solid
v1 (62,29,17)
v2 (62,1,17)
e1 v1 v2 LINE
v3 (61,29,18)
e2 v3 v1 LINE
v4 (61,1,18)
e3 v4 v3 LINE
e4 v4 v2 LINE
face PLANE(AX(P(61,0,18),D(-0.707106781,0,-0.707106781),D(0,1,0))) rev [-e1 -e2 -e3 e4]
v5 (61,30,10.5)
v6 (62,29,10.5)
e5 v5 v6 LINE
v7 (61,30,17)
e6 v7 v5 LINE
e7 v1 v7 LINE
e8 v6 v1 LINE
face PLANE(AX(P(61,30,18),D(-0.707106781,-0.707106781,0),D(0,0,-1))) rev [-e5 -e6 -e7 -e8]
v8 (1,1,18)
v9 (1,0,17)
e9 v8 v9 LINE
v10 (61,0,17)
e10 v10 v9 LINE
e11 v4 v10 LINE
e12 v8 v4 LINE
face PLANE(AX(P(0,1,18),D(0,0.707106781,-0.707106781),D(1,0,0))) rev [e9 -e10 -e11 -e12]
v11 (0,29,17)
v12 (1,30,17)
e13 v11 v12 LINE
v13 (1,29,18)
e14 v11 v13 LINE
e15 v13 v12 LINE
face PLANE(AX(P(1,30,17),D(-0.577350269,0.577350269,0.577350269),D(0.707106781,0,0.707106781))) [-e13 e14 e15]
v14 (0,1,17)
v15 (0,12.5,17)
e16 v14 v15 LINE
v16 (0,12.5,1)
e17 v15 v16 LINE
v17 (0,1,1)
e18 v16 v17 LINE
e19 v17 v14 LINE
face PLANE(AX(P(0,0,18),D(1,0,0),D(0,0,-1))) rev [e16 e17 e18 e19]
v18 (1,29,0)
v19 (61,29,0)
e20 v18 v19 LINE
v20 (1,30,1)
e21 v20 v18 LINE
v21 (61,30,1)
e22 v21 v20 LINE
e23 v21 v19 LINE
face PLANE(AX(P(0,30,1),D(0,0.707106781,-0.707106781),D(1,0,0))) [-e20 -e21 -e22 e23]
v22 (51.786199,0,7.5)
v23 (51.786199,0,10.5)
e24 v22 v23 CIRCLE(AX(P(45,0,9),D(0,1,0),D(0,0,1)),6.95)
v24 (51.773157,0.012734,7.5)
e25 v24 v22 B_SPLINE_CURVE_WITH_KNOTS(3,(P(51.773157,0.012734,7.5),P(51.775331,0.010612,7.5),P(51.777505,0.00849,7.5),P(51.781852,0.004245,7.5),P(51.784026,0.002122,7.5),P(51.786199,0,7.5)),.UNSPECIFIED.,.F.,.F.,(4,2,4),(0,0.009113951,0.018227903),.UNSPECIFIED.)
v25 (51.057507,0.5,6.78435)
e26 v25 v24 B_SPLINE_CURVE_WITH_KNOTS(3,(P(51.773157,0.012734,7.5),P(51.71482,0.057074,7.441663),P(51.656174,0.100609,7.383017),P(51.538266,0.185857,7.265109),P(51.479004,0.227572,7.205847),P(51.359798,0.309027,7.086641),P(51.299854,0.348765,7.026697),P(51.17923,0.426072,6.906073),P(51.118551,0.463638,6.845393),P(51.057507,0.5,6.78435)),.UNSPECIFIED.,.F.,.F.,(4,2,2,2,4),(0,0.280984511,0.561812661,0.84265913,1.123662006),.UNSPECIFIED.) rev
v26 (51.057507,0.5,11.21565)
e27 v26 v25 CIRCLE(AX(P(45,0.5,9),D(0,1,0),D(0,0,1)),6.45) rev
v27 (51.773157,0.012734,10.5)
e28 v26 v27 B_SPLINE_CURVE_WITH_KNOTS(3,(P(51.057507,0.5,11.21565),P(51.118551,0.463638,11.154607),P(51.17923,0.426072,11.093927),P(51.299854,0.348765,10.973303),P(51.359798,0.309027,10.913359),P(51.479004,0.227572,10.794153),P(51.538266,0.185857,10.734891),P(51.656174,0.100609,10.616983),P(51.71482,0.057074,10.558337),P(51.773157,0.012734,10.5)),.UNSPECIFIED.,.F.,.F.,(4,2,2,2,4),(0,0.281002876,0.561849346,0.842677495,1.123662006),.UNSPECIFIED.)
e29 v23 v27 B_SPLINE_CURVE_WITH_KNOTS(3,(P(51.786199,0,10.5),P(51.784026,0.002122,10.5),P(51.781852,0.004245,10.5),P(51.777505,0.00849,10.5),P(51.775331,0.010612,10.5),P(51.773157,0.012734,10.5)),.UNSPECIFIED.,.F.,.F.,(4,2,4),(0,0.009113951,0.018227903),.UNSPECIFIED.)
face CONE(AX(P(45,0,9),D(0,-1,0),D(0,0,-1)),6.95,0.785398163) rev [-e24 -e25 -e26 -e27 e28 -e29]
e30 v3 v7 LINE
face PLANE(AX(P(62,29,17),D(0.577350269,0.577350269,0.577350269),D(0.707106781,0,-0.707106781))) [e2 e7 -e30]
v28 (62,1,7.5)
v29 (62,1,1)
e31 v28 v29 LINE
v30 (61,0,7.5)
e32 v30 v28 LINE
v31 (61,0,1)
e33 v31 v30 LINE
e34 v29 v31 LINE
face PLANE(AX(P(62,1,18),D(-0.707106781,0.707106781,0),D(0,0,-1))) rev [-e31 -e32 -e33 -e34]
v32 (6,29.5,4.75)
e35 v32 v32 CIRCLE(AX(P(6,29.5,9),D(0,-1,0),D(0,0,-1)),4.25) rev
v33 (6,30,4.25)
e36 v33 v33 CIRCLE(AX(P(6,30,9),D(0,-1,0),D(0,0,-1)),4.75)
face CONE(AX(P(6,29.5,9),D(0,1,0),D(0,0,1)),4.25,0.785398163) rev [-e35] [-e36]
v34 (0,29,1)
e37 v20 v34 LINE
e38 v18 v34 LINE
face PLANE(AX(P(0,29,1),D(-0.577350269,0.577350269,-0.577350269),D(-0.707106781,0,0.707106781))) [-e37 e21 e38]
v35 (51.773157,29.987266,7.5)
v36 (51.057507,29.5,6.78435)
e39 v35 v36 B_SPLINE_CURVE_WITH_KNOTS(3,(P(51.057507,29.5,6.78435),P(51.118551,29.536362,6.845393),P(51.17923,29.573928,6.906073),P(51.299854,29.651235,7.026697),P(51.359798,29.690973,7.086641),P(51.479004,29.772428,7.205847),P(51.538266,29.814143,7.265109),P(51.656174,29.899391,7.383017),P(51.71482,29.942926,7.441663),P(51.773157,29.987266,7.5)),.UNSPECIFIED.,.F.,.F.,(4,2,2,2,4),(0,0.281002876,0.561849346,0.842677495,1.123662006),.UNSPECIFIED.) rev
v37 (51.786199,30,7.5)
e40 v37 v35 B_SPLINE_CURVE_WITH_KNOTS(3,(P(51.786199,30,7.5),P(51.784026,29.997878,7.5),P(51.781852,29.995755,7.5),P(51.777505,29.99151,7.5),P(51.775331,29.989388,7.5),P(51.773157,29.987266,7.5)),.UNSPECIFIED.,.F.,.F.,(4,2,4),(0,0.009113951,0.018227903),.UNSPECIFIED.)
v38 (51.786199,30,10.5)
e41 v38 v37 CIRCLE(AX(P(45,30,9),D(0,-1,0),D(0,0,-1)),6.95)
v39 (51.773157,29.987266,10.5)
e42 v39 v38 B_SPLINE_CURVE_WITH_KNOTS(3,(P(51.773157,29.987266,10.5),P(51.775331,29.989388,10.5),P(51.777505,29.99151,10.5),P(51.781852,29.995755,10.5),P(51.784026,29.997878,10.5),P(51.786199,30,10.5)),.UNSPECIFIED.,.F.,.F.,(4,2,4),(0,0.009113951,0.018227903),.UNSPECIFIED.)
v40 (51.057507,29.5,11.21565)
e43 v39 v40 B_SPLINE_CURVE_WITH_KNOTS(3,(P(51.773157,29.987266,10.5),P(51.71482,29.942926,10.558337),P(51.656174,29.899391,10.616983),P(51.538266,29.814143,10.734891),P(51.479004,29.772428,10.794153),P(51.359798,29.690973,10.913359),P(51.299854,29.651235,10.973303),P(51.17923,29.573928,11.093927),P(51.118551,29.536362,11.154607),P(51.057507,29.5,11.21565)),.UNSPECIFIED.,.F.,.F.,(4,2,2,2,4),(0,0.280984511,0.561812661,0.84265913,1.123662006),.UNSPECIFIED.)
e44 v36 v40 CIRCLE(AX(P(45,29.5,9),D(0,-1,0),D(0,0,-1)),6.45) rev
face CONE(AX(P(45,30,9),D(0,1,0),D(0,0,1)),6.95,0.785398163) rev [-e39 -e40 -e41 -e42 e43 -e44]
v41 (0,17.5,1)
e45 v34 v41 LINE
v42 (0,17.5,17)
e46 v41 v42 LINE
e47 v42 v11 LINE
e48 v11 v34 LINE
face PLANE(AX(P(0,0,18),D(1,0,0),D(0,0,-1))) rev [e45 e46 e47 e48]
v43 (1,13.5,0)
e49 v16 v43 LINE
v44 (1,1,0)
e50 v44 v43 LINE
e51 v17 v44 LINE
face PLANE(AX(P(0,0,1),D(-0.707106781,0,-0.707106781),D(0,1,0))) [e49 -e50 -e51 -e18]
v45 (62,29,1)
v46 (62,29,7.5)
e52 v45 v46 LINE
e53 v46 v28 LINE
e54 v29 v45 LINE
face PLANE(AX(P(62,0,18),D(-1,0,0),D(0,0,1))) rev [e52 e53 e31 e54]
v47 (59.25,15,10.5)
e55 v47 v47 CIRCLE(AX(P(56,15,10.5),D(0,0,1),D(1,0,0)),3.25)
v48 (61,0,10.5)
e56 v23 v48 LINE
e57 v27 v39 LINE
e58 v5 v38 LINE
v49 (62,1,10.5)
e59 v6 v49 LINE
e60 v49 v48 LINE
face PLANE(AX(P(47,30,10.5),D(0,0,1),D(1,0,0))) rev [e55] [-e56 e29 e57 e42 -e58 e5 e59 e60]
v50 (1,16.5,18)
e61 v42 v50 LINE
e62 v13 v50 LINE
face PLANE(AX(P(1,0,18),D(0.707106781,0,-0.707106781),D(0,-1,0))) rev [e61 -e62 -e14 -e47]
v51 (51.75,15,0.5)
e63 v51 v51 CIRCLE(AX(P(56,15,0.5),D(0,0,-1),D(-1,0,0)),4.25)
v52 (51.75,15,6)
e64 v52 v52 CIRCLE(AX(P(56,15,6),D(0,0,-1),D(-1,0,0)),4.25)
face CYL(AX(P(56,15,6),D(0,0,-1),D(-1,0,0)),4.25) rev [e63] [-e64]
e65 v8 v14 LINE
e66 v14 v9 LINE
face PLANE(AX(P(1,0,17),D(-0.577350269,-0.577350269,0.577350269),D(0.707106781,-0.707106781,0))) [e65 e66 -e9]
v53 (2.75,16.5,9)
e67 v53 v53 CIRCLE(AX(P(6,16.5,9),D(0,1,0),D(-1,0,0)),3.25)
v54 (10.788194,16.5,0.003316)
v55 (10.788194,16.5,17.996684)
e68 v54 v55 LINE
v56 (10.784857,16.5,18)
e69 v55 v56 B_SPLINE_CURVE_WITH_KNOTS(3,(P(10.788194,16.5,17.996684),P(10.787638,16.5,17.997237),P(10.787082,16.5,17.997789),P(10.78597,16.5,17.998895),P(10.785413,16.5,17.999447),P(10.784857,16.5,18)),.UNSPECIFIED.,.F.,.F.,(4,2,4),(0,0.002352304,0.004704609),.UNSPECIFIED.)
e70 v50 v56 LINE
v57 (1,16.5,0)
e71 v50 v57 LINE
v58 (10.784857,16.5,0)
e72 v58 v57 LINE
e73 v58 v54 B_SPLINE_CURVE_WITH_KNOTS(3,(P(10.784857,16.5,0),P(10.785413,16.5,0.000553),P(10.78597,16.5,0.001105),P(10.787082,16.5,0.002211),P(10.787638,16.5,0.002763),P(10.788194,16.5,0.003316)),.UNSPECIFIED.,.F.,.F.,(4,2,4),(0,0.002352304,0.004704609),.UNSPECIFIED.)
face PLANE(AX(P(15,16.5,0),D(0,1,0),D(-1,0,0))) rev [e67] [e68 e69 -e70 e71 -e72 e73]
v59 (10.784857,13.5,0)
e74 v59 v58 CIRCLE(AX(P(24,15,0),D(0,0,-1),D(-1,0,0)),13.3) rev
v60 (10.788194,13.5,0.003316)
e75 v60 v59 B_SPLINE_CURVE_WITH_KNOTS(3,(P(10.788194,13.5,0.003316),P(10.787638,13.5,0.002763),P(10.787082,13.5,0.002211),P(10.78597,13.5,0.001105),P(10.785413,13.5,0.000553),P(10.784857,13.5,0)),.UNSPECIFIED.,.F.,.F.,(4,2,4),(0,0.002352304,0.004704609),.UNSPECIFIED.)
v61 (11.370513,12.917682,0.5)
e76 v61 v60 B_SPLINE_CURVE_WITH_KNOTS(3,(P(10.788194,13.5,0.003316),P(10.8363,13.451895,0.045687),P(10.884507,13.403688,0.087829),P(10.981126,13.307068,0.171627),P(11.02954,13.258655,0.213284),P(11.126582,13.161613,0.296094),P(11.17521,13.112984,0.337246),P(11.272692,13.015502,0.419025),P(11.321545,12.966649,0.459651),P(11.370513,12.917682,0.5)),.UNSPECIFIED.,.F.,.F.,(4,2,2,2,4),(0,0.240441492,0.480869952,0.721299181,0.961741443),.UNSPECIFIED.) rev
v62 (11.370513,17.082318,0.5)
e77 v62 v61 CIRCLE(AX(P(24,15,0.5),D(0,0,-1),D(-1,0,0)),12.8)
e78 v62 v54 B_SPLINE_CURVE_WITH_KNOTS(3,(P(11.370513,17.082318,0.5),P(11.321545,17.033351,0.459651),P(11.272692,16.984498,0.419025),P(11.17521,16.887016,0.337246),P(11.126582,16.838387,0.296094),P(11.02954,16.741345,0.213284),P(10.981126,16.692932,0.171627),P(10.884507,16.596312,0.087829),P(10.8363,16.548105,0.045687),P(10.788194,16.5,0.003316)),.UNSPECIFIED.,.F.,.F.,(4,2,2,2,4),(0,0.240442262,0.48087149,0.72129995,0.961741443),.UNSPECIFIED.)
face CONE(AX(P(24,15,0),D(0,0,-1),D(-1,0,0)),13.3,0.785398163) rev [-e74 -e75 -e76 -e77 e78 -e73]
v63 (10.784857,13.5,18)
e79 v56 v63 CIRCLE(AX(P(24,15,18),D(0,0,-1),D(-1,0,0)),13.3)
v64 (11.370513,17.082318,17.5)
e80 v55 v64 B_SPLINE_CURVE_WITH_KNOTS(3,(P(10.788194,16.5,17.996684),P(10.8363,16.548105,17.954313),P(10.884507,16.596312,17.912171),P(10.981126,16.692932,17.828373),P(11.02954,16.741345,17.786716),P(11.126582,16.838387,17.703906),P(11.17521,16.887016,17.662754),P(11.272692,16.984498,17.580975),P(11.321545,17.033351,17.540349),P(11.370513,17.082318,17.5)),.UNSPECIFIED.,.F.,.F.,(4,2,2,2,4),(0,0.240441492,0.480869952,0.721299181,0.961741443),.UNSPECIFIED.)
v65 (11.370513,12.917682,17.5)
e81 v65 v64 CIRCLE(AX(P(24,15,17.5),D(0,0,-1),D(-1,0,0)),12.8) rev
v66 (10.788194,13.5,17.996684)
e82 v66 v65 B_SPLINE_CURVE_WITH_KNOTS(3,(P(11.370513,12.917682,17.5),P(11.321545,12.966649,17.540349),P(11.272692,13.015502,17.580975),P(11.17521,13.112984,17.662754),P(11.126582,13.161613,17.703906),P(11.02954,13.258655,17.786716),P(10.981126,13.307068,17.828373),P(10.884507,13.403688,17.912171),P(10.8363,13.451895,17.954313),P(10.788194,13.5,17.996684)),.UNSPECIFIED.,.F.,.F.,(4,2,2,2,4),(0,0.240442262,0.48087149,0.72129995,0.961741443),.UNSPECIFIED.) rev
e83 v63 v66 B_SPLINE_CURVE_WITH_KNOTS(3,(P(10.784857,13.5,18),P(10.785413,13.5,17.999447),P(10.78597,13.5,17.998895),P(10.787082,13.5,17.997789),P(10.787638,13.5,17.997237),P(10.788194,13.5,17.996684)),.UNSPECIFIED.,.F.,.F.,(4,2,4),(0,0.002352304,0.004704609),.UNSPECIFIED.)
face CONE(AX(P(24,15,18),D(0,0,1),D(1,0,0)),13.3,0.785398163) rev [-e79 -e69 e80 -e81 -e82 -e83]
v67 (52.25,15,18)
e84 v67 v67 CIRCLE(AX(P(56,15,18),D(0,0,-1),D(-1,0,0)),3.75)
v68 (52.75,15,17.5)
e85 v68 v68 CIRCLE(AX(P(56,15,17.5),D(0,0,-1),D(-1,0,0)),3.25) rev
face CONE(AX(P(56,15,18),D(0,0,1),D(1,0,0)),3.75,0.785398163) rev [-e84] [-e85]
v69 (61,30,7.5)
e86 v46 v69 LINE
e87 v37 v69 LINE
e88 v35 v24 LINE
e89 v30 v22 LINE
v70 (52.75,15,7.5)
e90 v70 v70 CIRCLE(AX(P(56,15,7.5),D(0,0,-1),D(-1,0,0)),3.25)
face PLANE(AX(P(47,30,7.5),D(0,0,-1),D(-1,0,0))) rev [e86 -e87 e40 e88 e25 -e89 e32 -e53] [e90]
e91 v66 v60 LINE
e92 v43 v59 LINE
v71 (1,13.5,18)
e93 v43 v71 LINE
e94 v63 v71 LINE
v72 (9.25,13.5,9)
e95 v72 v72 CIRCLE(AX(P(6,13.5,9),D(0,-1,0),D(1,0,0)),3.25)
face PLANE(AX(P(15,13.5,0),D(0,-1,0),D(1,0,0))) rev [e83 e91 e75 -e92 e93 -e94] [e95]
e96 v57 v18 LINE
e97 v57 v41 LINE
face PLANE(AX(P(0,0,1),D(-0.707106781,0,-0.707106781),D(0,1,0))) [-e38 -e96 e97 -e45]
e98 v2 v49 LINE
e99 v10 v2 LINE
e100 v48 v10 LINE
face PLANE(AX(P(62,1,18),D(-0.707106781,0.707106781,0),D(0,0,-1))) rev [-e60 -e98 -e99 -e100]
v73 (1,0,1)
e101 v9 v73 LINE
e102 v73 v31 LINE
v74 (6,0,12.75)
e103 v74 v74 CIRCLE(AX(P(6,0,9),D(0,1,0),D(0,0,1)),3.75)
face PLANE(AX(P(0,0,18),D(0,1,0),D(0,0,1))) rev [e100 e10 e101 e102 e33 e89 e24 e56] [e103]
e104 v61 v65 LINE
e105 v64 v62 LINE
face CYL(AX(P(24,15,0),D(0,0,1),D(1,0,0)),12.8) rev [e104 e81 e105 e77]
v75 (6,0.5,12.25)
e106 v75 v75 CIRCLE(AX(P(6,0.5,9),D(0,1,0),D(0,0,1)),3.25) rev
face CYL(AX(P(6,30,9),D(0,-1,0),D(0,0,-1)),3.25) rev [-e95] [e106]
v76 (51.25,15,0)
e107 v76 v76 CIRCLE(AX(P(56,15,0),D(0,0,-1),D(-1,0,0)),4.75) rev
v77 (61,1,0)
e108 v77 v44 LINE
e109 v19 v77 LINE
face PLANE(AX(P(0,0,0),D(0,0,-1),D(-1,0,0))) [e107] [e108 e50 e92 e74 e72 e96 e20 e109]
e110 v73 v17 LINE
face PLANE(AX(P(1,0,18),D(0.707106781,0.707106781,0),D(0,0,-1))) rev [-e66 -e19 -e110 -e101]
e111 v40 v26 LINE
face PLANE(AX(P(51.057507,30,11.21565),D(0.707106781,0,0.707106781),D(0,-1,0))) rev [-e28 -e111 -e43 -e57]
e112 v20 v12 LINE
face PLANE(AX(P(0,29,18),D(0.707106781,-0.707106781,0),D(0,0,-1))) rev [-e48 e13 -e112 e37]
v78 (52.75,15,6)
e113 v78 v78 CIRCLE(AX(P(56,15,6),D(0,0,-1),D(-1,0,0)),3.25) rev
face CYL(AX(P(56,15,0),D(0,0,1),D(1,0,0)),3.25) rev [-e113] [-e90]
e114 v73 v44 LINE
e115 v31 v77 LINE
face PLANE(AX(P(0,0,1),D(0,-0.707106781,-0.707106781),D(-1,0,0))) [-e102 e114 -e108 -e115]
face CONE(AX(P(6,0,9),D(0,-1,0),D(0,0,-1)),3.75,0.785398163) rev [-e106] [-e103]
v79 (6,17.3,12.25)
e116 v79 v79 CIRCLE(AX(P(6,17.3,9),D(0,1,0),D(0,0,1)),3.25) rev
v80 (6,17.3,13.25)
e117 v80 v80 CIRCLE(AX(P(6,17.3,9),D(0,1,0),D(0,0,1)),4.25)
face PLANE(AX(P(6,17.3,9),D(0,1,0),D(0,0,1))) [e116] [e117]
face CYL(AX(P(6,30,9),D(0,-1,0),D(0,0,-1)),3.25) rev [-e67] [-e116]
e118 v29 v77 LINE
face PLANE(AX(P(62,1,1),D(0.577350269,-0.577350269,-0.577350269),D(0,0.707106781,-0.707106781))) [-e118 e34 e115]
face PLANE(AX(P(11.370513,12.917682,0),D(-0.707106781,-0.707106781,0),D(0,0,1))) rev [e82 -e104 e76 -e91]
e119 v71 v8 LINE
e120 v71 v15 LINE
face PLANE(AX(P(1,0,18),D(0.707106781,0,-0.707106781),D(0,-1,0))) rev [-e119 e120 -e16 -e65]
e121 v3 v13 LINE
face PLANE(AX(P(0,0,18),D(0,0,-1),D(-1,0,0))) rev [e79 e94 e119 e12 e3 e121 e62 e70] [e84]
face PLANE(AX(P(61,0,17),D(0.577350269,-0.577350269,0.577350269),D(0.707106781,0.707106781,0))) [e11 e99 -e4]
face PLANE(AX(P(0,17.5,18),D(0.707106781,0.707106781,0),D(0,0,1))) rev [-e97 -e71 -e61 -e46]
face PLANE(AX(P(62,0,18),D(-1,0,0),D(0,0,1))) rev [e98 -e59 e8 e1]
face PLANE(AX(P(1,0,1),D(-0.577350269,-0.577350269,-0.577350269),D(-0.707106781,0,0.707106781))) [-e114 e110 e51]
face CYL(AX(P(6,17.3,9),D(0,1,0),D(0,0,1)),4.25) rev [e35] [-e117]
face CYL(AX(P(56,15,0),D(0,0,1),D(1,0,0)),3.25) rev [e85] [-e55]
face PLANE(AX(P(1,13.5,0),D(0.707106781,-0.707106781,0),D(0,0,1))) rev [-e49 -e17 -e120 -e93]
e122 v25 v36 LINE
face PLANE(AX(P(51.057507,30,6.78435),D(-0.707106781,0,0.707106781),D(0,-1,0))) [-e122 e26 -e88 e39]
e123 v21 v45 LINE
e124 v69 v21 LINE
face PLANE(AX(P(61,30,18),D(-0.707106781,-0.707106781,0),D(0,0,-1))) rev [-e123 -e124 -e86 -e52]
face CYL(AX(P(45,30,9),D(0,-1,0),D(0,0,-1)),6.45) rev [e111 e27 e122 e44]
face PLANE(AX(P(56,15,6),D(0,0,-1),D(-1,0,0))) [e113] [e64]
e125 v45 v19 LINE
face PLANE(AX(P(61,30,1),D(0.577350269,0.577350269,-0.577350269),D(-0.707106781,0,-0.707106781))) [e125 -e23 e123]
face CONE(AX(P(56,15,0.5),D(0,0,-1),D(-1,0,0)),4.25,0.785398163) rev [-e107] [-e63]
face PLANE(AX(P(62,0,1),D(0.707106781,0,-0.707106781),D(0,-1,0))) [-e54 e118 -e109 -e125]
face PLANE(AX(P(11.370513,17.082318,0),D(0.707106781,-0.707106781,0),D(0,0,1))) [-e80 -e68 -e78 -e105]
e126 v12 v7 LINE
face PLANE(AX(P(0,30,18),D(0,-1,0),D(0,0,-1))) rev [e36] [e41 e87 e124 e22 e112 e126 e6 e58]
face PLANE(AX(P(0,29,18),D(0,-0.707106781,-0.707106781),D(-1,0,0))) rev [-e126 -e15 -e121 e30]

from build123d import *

# Parameters (mm, degrees)
ESQUISSE1_W                  = 62
ESQUISSE1_H                  = 30
BOSS_EXTRU_1_DEPTH           = 18
ENL_V_MAT_EXTRU_1_DEPTH      = 72.189886922
ENL_V_MAT_EXTRU_1_DEPTH_BACK = 72.189886922
ESQUISSE2_R                  = 12.8
ENL_V_MAT_EXTRU_2_DEPTH      = 72.189886922
ENL_V_MAT_EXTRU_2_DEPTH_BACK = 72.189886922
ESQUISSE3_W                  = 15
ESQUISSE3_H                  = 3
ENL_V_MAT_EXTRU_3_DEPTH      = 72.189886922
ENL_V_MAT_EXTRU_3_DEPTH_BACK = 72.189886922
ESQUISSE4_R                  = 6.45
ESQUISSE4_R_2                = 3.25
ENL_V_MAT_EXTRU_4_DEPTH      = 72.189886922
ENL_V_MAT_EXTRU_4_DEPTH_BACK = 72.189886922
ESQUISSE6_W                  = 15
ESQUISSE6_H                  = 3
ENL_V_MAT_EXTRU_5_DEPTH      = 72.189886922
ENL_V_MAT_EXTRU_5_DEPTH_BACK = 72.189886922
ESQUISSE8_R                  = 3.25
ESQUISSE9_R                  = 4.25
ENL_V_MAT_EXTRU_6_DEPTH      = 12.7
ESQUISSE10_R                 = 4.25
ENL_V_MAT_EXTRU_7_DEPTH      = 6
CHANFREIN1_SIZE              = 0.5
CHANFREIN2_SIZE              = 1


with BuildPart() as part:
    # Esquisse1 → Boss.-Extru.1 (new body)
    with BuildSketch(Plane.XY):
        with Locations((31, 15)):
            Rectangle(ESQUISSE1_W, ESQUISSE1_H)
    extrude(amount=BOSS_EXTRU_1_DEPTH)

    # Esquisse2 → Enlèv. mat.-Extru.1 (cut, two sides: drawn at the far end of the back side and taken through both)
    with BuildSketch(Plane.XY.offset(18).offset(-ENL_V_MAT_EXTRU_1_DEPTH_BACK)):
        with Locations((24, 15)):
            Circle(ESQUISSE2_R)
    extrude(amount=ENL_V_MAT_EXTRU_1_DEPTH + ENL_V_MAT_EXTRU_1_DEPTH_BACK, mode=Mode.SUBTRACT)

    # Esquisse3 → Enlèv. mat.-Extru.2 (cut, two sides: drawn at the far end of the back side and taken through both)
    with BuildSketch(Plane.XY.offset(18).offset(-ENL_V_MAT_EXTRU_2_DEPTH_BACK)):
        with Locations((7.5, 15)):
            Rectangle(ESQUISSE3_W, ESQUISSE3_H)
    extrude(amount=ENL_V_MAT_EXTRU_2_DEPTH + ENL_V_MAT_EXTRU_2_DEPTH_BACK, mode=Mode.SUBTRACT)

    # Esquisse4 → Enlèv. mat.-Extru.3 (cut, two sides: drawn at the far end of the back side and taken through both)
    with BuildSketch(Plane.XZ.offset(-ENL_V_MAT_EXTRU_3_DEPTH_BACK)):
        with Locations(Location((45, 9, 0), (0, 0, 270))):
            Circle(ESQUISSE4_R)
        with Locations((6, 9)):
            Circle(ESQUISSE4_R_2)
    extrude(amount=ENL_V_MAT_EXTRU_3_DEPTH + ENL_V_MAT_EXTRU_3_DEPTH_BACK, mode=Mode.SUBTRACT)

    # Esquisse6 → Enlèv. mat.-Extru.4 (cut, two sides: drawn at the far end of the back side and taken through both)
    with BuildSketch(Plane.XZ.offset(-ENL_V_MAT_EXTRU_4_DEPTH_BACK)):
        with Locations((54.5, 9)):
            Rectangle(ESQUISSE6_W, ESQUISSE6_H)
    extrude(amount=ENL_V_MAT_EXTRU_4_DEPTH + ENL_V_MAT_EXTRU_4_DEPTH_BACK, mode=Mode.SUBTRACT)

    # Esquisse8 → Enlèv. mat.-Extru.5 (cut, two sides: drawn at the far end of the back side and taken through both)
    with BuildSketch(Plane.XY.offset(18).offset(-ENL_V_MAT_EXTRU_5_DEPTH_BACK)):
        with Locations((56, 15)):
            Circle(ESQUISSE8_R)
    extrude(amount=ENL_V_MAT_EXTRU_5_DEPTH + ENL_V_MAT_EXTRU_5_DEPTH_BACK, mode=Mode.SUBTRACT)

    # Esquisse9 → Enlèv. mat.-Extru.6 (cut)
    with BuildSketch(Plane(origin=(0, 30, 0), x_dir=(1, 0, 0), z_dir=(0, 1, 0))):
        with Locations(Location((6, -9, 0), (0, 0, 270))):
            Circle(ESQUISSE9_R)
    extrude(amount=-ENL_V_MAT_EXTRU_6_DEPTH, mode=Mode.SUBTRACT)

    # Esquisse10 → Enlèv. mat.-Extru.7 (cut)
    with BuildSketch(Plane(origin=(0, 0, 0), x_dir=(-1, 0, 0), z_dir=(0, 0, -1))):
        with Locations((-56, 15)):
            Circle(ESQUISSE10_R)
    extrude(amount=-ENL_V_MAT_EXTRU_7_DEPTH, mode=Mode.SUBTRACT)

    # Chanfrein1
    # the kernel refuses this chamfer: 0.675653437, 0.570826882, 0.5 mm, written as the material it takes off along each edge
    with BuildSketch(Plane(origin=(6, 0, 9), x_dir=(1, 0, 0), z_dir=(0, 0, -1))) as chanfrein1_piece_1:
        Polygon((3.25 + CHANFREIN1_SIZE, 0), (3.25, -CHANFREIN1_SIZE), (3.25, 0), align=None)
    revolve(axis=Axis((6, 0, 9), (0, -1, 0)), mode=Mode.SUBTRACT)
    with BuildSketch(Plane(origin=(56, 15, 18), x_dir=(1, 0, 0), z_dir=(0, -1, 0))) as chanfrein1_piece_2:
        Polygon((3.25 + CHANFREIN1_SIZE, 0), (3.25, -CHANFREIN1_SIZE), (3.25, 0), align=None)
    revolve(axis=Axis((56, 15, 18), (0, 0, 1)), mode=Mode.SUBTRACT)
    with BuildSketch(Plane(origin=(6, 30, 9), x_dir=(0, 0, 1), z_dir=(-1, 0, 0))) as chanfrein1_piece_3:
        Polygon((4.25 + CHANFREIN1_SIZE, 0), (4.25, -CHANFREIN1_SIZE), (4.25, 0), align=None)
    revolve(axis=Axis((6, 30, 9), (0, 1, 0)), mode=Mode.SUBTRACT)
    with BuildSketch(Plane(origin=(56, 15, 0), x_dir=(-1, 0, 0), z_dir=(0, -1, 0))) as chanfrein1_piece_4:
        Polygon((4.25 + CHANFREIN1_SIZE, 0), (4.25, -CHANFREIN1_SIZE), (4.25, 0), align=None)
    revolve(axis=Axis((56, 15, 0), (0, 0, -1)), mode=Mode.SUBTRACT)
    with BuildSketch(Plane(origin=(11.288194463, 16.5, -1.516273716), x_dir=(0.1399712439743316, 0.990155569019474, 0), z_dir=(0, 0, 1))) as chanfrein1_piece_5:
        with BuildLine():
            Line((0.588107761, 0), (-CHANFREIN1_SIZE * 0.139971243974, CHANFREIN1_SIZE * 0.990155569019))
            Line((-CHANFREIN1_SIZE * 0.139971243974, CHANFREIN1_SIZE * 0.990155569019), (0, 0))
            ThreePointArc((0, 0), (0.303184371, 0.003374833), (0.588107761, 0))
        make_face()
    extrude(amount=21.032547433, mode=Mode.SUBTRACT)
    with BuildSketch(Plane(origin=(11.288194463, 13.5, -1.516273716), x_dir=(-1, 0, 0), z_dir=(0, 0, 1))) as chanfrein1_piece_6:
        with BuildLine():
            Line((CHANFREIN1_SIZE, 0), (-0.082318175, 0.582318175))
            ThreePointArc((-0.082318175, 0.582318175), (-0.039095484, 0.300672073), (0, 0))
            Line((0, 0), (CHANFREIN1_SIZE, 0))
        make_face()
    extrude(amount=21.032547433, mode=Mode.SUBTRACT)
    with BuildSketch(Plane(origin=(51.2731571, 31.928380981, 10.5), x_dir=(1, 0, 0), z_dir=(0, -1, 0))) as chanfrein1_piece_7:
        with BuildLine():
            Line((CHANFREIN1_SIZE, 0), (-0.215649634, 0.715649634))
            ThreePointArc((-0.215649634, 0.715649634), (-0.100904588, 0.372377882), (0, 0))
            Line((0, 0), (CHANFREIN1_SIZE, 0))
        make_face()
    extrude(amount=33.856761963, mode=Mode.SUBTRACT)
    with BuildSketch(Plane(origin=(51.2731571, 31.928380981, 7.5), x_dir=(-0.28851956060345535, 0, -0.9574740012915176), z_dir=(0, -1, 0))) as chanfrein1_piece_8:
        with BuildLine():
            Line((0.747435056, 0), (-CHANFREIN1_SIZE * 0.288519560603, CHANFREIN1_SIZE * 0.957474001292))
            Line((-CHANFREIN1_SIZE * 0.288519560603, CHANFREIN1_SIZE * 0.957474001292), (0, 0))
            ThreePointArc((0, 0), (0.385655089, 0.010824783), (0.747435056, 0))
        make_face()
    extrude(amount=33.856761963, mode=Mode.SUBTRACT)
    # the kernel refuses this chamfer: 0.675653437, 0.570826882, 0.5 mm, written as the material it takes off along each edge
    with BuildSketch(Plane(origin=(24, 15, 18), x_dir=(-0.9980557123023516, 0.06232812479648115, 0), z_dir=(-0.06232812479648115, -0.9980557123023516, 0))) as chanfrein1_2_piece_1:
        Polygon((12.8, CHANFREIN1_SIZE), (12.8 + CHANFREIN1_SIZE, 0), (12.8, 0), align=None)
    revolve(axis=Axis((24, 15, 18), (0, 0, -1)), revolution_arc=352.853090525, mode=Mode.SUBTRACT)
    with BuildSketch(Plane(origin=(24, 15, 0), x_dir=(-0.9980557123023512, -0.06232812479648351, 0), z_dir=(-0.06232812479648351, 0.9980557123023512, 0))) as chanfrein1_2_piece_2:
        Polygon((12.8, CHANFREIN1_SIZE), (12.8 + CHANFREIN1_SIZE, 0), (12.8, 0), align=None)
    revolve(axis=Axis((24, 15, 0), (0, 0, 1)), revolution_arc=352.853090525, mode=Mode.SUBTRACT)
    with BuildSketch(Plane(origin=(45, 30, 9), x_dir=(0.9887286551586735, 0, -0.14971855752751953), z_dir=(0.14971855752751953, 0, 0.9887286551586735))) as chanfrein1_2_piece_3:
        Polygon((6.45 + CHANFREIN1_SIZE, 0), (6.45, -CHANFREIN1_SIZE), (6.45, 0), align=None)
    revolve(axis=Axis((45, 30, 9), (0, 1, 0)), revolution_arc=342.778766173, mode=Mode.SUBTRACT)
    with BuildSketch(Plane(origin=(45, 0, 9), x_dir=(0.9887286551586734, 0, -0.14971855752752006), z_dir=(0.14971855752752006, 0, 0.9887286551586734))) as chanfrein1_2_piece_4:
        Polygon((6.45 + CHANFREIN1_SIZE, 0), (6.45, CHANFREIN1_SIZE), (6.45, 0), align=None)
    revolve(axis=Axis((45, 0, 9), (0, 1, 0)), revolution_arc=342.778766173, mode=Mode.SUBTRACT)

    # Chanfrein2
    chanfrein2_edges = [part.edges().sort_by_distance(p)[0] for p in [
        (62, 15, 18),
        (31, 30, 18),
        (0, 6.75, 0),
        (0, 6.75, 18),
        (0, 13.5, 9),
        (0, 16.5, 9),
        (0, 23.25, 18),
        (31, 30, 0),
        (62, 15, 0),
        (31, 0, 0),
        (62, 30, 3.75),
        (0, 23.25, 0),
        (62, 0, 3.75),
        (31, 0, 18),
        (0, 30, 9),
        (62, 30, 14.25),
        (62, 0, 14.25),
        (0, 0, 9),
    ]]
    chamfer(chanfrein2_edges, length=CHANFREIN2_SIZE)


solid = part.part
